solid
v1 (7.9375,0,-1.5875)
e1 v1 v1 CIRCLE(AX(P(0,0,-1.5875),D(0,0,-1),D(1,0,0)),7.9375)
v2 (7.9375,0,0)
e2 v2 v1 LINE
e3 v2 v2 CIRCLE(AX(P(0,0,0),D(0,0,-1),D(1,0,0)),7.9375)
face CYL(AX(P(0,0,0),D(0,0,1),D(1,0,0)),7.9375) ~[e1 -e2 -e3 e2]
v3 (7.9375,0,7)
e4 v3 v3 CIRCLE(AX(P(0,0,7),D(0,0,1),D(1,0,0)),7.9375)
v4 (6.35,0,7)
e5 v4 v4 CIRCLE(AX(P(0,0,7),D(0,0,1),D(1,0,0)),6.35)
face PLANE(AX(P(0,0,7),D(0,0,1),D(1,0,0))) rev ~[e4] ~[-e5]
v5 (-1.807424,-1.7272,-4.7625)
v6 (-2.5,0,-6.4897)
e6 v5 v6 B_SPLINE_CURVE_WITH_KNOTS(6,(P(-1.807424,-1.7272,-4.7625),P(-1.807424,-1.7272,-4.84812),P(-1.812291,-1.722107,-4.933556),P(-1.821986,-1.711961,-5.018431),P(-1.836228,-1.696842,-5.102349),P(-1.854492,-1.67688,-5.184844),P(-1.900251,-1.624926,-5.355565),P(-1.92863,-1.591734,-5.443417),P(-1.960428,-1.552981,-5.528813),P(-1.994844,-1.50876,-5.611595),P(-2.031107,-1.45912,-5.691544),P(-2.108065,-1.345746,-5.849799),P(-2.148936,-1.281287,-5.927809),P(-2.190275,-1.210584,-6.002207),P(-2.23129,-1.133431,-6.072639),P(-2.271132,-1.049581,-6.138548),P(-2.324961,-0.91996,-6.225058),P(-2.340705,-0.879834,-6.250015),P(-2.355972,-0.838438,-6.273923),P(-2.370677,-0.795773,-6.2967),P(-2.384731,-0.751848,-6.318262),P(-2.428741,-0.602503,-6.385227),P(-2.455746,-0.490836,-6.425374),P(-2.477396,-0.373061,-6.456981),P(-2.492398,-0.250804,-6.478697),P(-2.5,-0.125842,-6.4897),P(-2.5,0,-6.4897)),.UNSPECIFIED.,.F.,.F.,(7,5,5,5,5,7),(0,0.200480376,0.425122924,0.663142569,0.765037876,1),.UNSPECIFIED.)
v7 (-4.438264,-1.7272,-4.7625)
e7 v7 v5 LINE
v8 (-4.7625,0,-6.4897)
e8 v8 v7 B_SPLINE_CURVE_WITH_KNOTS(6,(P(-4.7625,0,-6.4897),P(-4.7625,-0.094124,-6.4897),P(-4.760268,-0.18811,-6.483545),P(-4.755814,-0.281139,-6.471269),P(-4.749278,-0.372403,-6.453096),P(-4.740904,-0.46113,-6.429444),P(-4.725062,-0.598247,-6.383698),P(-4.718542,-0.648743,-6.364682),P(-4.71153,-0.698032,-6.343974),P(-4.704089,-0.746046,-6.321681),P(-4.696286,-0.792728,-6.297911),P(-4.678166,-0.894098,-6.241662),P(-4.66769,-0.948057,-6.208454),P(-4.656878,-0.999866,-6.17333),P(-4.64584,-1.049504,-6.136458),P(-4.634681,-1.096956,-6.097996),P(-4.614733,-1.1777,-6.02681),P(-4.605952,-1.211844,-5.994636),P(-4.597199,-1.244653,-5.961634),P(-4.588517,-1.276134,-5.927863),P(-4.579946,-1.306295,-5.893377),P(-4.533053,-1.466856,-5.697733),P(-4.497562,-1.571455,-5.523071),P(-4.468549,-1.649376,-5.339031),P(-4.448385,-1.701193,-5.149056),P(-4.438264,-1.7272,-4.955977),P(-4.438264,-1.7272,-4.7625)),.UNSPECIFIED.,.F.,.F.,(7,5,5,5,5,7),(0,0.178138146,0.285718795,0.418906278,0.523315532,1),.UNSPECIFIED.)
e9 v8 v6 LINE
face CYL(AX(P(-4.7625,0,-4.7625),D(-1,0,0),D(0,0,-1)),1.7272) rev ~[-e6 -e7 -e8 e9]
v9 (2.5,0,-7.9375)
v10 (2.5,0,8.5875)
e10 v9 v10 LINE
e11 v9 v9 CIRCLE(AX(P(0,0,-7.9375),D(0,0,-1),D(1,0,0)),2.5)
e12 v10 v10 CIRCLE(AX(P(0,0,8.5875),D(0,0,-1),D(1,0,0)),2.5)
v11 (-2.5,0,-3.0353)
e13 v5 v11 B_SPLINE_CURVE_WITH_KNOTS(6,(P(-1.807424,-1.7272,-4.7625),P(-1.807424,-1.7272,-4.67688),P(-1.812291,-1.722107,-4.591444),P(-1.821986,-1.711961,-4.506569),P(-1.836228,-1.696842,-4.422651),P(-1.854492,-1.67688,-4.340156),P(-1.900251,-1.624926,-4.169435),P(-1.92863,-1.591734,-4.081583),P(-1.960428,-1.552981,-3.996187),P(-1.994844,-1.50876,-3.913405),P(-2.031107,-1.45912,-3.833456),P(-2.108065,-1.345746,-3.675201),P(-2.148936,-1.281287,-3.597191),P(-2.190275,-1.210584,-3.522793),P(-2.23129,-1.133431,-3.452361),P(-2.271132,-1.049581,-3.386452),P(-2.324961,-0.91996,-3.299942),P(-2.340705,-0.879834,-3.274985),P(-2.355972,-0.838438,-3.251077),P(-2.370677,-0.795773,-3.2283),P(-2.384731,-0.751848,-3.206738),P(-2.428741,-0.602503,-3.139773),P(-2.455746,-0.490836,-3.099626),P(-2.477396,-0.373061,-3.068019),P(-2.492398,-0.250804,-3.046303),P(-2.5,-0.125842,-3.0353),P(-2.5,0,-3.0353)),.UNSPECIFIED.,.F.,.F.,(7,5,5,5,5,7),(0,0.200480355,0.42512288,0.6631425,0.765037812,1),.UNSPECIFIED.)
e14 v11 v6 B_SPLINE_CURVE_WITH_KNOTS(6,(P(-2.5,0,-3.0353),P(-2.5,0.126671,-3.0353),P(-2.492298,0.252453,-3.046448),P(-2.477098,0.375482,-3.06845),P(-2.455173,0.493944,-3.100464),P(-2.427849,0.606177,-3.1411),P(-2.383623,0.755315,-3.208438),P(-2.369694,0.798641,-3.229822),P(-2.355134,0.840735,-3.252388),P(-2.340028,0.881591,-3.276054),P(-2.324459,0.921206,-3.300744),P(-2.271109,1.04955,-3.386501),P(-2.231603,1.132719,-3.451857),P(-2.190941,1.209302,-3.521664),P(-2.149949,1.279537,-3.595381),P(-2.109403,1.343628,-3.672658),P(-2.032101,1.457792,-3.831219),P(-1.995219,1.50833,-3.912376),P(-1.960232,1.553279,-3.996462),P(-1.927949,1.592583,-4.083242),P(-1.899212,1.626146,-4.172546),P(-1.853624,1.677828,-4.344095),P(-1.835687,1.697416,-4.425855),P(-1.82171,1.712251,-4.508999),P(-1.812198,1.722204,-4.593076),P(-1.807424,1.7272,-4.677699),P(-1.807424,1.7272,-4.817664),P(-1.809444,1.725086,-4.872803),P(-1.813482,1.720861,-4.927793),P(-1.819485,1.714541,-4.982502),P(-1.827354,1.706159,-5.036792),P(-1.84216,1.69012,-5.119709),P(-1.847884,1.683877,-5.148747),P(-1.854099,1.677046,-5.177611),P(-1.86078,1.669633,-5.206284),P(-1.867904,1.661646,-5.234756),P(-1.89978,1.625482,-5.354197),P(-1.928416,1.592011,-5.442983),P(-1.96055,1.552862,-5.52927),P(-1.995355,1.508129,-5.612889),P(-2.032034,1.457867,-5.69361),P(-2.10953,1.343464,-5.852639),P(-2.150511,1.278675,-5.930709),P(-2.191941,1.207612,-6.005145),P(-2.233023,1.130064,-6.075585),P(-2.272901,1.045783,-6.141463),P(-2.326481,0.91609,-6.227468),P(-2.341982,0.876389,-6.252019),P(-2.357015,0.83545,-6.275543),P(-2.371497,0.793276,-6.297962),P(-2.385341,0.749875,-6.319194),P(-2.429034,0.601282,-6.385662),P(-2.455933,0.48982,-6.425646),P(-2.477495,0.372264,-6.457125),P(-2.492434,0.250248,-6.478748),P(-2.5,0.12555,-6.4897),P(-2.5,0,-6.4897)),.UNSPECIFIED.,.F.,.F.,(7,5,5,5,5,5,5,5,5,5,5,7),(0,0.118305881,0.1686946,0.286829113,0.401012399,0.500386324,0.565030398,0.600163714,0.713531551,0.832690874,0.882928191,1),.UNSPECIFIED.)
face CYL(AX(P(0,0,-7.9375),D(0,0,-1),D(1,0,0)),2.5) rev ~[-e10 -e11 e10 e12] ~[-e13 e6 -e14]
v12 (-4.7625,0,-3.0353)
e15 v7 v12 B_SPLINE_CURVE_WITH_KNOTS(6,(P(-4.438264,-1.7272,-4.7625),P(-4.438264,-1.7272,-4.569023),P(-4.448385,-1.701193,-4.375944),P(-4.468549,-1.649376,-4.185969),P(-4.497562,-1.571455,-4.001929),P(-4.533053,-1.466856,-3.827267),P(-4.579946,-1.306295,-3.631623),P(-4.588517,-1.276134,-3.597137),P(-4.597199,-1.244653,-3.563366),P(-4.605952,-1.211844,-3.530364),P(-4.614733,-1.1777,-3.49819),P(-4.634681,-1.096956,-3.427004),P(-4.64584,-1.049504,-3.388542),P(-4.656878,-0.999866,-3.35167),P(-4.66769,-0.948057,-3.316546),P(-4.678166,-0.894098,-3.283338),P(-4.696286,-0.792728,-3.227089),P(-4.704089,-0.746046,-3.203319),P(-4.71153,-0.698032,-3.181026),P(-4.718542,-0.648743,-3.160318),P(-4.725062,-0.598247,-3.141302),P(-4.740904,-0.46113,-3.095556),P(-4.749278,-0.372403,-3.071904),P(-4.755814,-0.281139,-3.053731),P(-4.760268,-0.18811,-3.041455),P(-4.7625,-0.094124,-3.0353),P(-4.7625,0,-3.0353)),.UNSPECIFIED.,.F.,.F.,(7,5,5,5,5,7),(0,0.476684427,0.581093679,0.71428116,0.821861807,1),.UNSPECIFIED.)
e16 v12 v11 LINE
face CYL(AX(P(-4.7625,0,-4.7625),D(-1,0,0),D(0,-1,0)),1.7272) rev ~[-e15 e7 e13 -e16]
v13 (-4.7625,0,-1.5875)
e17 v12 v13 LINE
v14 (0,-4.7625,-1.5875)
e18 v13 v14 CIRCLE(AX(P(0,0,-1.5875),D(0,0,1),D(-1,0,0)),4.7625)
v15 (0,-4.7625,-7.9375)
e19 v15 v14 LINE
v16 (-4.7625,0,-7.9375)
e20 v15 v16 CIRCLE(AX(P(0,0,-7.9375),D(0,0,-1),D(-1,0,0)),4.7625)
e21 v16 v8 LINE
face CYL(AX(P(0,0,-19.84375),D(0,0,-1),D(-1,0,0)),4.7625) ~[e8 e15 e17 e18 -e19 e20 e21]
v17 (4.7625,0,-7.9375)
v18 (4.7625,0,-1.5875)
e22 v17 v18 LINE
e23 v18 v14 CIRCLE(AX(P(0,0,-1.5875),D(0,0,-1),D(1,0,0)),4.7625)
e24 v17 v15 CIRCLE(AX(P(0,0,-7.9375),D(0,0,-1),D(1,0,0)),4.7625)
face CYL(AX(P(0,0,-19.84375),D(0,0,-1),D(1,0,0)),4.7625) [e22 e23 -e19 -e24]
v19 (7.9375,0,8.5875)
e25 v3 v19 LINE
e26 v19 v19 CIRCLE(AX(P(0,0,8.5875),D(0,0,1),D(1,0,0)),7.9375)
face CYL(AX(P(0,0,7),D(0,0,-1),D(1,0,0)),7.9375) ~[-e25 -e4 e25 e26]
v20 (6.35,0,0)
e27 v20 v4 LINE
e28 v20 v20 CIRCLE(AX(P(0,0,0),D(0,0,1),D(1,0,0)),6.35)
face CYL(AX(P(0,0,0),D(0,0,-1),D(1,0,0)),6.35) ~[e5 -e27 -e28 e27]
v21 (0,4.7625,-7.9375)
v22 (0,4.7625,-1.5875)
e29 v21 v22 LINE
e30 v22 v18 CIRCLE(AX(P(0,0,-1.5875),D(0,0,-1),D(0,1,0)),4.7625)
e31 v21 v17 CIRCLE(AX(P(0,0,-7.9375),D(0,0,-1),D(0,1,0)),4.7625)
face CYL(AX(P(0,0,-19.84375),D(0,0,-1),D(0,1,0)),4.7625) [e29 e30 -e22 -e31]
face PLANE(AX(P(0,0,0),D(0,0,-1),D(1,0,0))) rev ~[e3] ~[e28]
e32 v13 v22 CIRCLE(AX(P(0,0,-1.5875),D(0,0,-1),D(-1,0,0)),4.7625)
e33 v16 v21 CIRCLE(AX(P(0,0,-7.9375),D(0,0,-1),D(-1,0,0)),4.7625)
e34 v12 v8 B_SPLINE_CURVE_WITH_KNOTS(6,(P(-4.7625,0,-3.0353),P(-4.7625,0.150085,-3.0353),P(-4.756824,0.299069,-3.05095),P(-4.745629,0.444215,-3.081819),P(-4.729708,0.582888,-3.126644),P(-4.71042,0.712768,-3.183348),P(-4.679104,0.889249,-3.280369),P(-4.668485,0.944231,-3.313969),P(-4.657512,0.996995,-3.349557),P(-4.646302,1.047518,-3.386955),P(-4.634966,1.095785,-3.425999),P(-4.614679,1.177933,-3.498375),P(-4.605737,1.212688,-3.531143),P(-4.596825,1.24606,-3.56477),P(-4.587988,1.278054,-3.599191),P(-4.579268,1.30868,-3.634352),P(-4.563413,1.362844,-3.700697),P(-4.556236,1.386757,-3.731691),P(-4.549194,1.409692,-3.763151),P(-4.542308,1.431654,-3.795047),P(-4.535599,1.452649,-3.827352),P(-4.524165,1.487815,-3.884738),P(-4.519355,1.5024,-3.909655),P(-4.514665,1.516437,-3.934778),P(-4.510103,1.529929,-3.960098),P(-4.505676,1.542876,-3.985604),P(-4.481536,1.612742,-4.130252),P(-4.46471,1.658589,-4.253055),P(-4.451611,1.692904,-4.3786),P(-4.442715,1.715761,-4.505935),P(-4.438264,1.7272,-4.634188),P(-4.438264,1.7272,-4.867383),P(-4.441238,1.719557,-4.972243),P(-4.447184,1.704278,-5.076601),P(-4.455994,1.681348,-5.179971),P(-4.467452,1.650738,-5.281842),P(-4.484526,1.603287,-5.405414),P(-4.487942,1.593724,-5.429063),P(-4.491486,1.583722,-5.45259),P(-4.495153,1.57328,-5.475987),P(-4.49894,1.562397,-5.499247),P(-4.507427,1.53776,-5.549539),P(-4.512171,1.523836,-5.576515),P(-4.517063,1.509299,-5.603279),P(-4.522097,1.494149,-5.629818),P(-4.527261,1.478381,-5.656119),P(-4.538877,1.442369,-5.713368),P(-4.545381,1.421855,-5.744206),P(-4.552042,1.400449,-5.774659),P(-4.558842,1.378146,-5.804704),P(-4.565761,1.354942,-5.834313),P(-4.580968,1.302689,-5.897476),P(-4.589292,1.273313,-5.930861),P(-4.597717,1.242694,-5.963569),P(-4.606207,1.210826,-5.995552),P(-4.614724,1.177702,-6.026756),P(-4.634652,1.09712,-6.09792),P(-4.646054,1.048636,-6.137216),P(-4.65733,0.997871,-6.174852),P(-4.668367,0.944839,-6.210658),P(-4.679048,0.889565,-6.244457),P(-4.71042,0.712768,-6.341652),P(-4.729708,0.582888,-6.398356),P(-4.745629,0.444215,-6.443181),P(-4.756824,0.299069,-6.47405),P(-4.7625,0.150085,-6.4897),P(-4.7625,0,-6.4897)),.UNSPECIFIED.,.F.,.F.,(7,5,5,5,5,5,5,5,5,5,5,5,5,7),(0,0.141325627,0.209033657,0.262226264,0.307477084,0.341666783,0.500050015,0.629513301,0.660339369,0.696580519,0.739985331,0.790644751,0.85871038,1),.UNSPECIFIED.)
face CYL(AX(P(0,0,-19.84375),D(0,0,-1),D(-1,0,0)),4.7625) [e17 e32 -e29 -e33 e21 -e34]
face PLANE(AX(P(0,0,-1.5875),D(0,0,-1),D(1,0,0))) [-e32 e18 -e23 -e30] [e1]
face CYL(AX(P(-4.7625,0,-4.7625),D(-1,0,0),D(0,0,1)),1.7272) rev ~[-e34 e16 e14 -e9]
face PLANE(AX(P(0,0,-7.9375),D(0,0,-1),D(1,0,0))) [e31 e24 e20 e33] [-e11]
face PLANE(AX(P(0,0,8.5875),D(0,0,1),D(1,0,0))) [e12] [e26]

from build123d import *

# Parameters (mm, degrees)
F0_R         = 6.35
F1_DEPTH     = 7
F2_R         = 7.9375
F3_DEPTH     = 1.5875
F4_R         = 7.9375
F5_DEPTH     = 1.5875
F6_W         = 9.525
F6_H         = 9.525
F7_DEPTH     = 6.35
F8_R         = 2.5
F9_DEPTH     = 16.525
F11_REACH    = 16.5631366107
F12_T1_DEPTH = 18.25625


# Not quite as in the source:
# - a fillet or chamfer that OpenCascade refuses, or shapes differently, is made with other operations: its cross-section is extruded or revolved along the edge and cut away or added


with BuildPart() as f1:
    # F0 (on Top) → F1 (new body)
    with BuildSketch(Plane.XY):
        Circle(F0_R)
    extrude(amount=F1_DEPTH)

    # F2 (on face) → F3 (join)
    with BuildSketch(Plane.XY.offset(7)):
        Circle(F2_R)
    extrude(amount=F3_DEPTH)

    # F4 (on face) → F5 (join)
    with BuildSketch(Plane(origin=(0, 0, 0), x_dir=(1, 0, 0), z_dir=(0, 0, -1))):
        Circle(F4_R)
    extrude(amount=F5_DEPTH)

    # F6 (on face) → F7 (join)
    with BuildSketch(Plane(origin=(0, 0, -1.5875), x_dir=(1, 0, 0), z_dir=(0, 0, -1))):
        Rectangle(F6_W, F6_H)
    extrude(amount=F7_DEPTH)

    # F8 (on face) → F9 (cut, through all)
    with BuildSketch(Plane(origin=(0, 0, -7.9375), x_dir=(1, 0, 0), z_dir=(0, 0, -1))):
        Circle(F8_R)
    extrude(amount=-F9_DEPTH, mode=Mode.SUBTRACT)

    f11_end = f1.faces().sort_by_distance((-2.5, 0, 0.325))[0]
    # F10 (on face) → F11 (cut, up to a face of the model that its end follows)
    with BuildSketch(Plane(origin=(-4.7625, 0, 0), x_dir=(0, -1, 0), z_dir=(-1, 0, 0))):
        with BuildLine():
            ThreePointArc((0, -3.0353), (-1.7272, -4.7625), (0, -6.4897))
            Line((0, -6.4897), (0, -3.0353))
        make_face()
        with BuildLine():
            Line((0, -3.0353), (0, -6.4897))
            ThreePointArc((0, -6.4897), (1.2213148325, -5.9838148325), (1.7272, -4.7625))
            ThreePointArc((1.7272, -4.7625), (1.2213148325, -3.5411851675), (0, -3.0353))
        make_face()
    f11_long = extrude(amount=-F11_REACH, mode=Mode.PRIVATE)
    add(split(f11_long, bisect_by=f11_end, keep=Keep.ALL, mode=Mode.PRIVATE).solids().sort_by_distance((-4.7625, 0, -4.7625))[0], mode=Mode.SUBTRACT)

    # F12: fillet of radius 4.7625 on 4 edges, made by hand

    # F12_s2 → F12_t1 (cut)
    with BuildSketch(Plane.XY.offset(-19.84375)):
        with BuildLine():
            ThreePointArc((-4.7625, 0), (-3.3675960454, -3.3675960454), (0, -4.7625))
            Line((0, -4.7625), (-4.7625, -4.7625))
            Line((-4.7625, -4.7625), (-4.7625, 0))
        make_face()
        with BuildLine():
            ThreePointArc((-4.7625, 0), (-3.3675960454, 3.3675960454), (0, 4.7625))
            Line((0, 4.7625), (-4.7625, 4.7625))
            Line((-4.7625, 4.7625), (-4.7625, 0))
        make_face()
        with BuildLine():
            ThreePointArc((0, 4.7625), (3.3675960454, 3.3675960454), (4.7625, 0))
            Line((4.7625, 0), (4.7625, 4.7625))
            Line((4.7625, 4.7625), (0, 4.7625))
        make_face()
        with BuildLine():
            ThreePointArc((4.7625, 0), (3.3675960454, -3.3675960454), (0, -4.7625))
            Line((0, -4.7625), (4.7625, -4.7625))
            Line((4.7625, -4.7625), (4.7625, 0))
        make_face()
    extrude(amount=F12_T1_DEPTH, mode=Mode.SUBTRACT)


solid = f1.part
